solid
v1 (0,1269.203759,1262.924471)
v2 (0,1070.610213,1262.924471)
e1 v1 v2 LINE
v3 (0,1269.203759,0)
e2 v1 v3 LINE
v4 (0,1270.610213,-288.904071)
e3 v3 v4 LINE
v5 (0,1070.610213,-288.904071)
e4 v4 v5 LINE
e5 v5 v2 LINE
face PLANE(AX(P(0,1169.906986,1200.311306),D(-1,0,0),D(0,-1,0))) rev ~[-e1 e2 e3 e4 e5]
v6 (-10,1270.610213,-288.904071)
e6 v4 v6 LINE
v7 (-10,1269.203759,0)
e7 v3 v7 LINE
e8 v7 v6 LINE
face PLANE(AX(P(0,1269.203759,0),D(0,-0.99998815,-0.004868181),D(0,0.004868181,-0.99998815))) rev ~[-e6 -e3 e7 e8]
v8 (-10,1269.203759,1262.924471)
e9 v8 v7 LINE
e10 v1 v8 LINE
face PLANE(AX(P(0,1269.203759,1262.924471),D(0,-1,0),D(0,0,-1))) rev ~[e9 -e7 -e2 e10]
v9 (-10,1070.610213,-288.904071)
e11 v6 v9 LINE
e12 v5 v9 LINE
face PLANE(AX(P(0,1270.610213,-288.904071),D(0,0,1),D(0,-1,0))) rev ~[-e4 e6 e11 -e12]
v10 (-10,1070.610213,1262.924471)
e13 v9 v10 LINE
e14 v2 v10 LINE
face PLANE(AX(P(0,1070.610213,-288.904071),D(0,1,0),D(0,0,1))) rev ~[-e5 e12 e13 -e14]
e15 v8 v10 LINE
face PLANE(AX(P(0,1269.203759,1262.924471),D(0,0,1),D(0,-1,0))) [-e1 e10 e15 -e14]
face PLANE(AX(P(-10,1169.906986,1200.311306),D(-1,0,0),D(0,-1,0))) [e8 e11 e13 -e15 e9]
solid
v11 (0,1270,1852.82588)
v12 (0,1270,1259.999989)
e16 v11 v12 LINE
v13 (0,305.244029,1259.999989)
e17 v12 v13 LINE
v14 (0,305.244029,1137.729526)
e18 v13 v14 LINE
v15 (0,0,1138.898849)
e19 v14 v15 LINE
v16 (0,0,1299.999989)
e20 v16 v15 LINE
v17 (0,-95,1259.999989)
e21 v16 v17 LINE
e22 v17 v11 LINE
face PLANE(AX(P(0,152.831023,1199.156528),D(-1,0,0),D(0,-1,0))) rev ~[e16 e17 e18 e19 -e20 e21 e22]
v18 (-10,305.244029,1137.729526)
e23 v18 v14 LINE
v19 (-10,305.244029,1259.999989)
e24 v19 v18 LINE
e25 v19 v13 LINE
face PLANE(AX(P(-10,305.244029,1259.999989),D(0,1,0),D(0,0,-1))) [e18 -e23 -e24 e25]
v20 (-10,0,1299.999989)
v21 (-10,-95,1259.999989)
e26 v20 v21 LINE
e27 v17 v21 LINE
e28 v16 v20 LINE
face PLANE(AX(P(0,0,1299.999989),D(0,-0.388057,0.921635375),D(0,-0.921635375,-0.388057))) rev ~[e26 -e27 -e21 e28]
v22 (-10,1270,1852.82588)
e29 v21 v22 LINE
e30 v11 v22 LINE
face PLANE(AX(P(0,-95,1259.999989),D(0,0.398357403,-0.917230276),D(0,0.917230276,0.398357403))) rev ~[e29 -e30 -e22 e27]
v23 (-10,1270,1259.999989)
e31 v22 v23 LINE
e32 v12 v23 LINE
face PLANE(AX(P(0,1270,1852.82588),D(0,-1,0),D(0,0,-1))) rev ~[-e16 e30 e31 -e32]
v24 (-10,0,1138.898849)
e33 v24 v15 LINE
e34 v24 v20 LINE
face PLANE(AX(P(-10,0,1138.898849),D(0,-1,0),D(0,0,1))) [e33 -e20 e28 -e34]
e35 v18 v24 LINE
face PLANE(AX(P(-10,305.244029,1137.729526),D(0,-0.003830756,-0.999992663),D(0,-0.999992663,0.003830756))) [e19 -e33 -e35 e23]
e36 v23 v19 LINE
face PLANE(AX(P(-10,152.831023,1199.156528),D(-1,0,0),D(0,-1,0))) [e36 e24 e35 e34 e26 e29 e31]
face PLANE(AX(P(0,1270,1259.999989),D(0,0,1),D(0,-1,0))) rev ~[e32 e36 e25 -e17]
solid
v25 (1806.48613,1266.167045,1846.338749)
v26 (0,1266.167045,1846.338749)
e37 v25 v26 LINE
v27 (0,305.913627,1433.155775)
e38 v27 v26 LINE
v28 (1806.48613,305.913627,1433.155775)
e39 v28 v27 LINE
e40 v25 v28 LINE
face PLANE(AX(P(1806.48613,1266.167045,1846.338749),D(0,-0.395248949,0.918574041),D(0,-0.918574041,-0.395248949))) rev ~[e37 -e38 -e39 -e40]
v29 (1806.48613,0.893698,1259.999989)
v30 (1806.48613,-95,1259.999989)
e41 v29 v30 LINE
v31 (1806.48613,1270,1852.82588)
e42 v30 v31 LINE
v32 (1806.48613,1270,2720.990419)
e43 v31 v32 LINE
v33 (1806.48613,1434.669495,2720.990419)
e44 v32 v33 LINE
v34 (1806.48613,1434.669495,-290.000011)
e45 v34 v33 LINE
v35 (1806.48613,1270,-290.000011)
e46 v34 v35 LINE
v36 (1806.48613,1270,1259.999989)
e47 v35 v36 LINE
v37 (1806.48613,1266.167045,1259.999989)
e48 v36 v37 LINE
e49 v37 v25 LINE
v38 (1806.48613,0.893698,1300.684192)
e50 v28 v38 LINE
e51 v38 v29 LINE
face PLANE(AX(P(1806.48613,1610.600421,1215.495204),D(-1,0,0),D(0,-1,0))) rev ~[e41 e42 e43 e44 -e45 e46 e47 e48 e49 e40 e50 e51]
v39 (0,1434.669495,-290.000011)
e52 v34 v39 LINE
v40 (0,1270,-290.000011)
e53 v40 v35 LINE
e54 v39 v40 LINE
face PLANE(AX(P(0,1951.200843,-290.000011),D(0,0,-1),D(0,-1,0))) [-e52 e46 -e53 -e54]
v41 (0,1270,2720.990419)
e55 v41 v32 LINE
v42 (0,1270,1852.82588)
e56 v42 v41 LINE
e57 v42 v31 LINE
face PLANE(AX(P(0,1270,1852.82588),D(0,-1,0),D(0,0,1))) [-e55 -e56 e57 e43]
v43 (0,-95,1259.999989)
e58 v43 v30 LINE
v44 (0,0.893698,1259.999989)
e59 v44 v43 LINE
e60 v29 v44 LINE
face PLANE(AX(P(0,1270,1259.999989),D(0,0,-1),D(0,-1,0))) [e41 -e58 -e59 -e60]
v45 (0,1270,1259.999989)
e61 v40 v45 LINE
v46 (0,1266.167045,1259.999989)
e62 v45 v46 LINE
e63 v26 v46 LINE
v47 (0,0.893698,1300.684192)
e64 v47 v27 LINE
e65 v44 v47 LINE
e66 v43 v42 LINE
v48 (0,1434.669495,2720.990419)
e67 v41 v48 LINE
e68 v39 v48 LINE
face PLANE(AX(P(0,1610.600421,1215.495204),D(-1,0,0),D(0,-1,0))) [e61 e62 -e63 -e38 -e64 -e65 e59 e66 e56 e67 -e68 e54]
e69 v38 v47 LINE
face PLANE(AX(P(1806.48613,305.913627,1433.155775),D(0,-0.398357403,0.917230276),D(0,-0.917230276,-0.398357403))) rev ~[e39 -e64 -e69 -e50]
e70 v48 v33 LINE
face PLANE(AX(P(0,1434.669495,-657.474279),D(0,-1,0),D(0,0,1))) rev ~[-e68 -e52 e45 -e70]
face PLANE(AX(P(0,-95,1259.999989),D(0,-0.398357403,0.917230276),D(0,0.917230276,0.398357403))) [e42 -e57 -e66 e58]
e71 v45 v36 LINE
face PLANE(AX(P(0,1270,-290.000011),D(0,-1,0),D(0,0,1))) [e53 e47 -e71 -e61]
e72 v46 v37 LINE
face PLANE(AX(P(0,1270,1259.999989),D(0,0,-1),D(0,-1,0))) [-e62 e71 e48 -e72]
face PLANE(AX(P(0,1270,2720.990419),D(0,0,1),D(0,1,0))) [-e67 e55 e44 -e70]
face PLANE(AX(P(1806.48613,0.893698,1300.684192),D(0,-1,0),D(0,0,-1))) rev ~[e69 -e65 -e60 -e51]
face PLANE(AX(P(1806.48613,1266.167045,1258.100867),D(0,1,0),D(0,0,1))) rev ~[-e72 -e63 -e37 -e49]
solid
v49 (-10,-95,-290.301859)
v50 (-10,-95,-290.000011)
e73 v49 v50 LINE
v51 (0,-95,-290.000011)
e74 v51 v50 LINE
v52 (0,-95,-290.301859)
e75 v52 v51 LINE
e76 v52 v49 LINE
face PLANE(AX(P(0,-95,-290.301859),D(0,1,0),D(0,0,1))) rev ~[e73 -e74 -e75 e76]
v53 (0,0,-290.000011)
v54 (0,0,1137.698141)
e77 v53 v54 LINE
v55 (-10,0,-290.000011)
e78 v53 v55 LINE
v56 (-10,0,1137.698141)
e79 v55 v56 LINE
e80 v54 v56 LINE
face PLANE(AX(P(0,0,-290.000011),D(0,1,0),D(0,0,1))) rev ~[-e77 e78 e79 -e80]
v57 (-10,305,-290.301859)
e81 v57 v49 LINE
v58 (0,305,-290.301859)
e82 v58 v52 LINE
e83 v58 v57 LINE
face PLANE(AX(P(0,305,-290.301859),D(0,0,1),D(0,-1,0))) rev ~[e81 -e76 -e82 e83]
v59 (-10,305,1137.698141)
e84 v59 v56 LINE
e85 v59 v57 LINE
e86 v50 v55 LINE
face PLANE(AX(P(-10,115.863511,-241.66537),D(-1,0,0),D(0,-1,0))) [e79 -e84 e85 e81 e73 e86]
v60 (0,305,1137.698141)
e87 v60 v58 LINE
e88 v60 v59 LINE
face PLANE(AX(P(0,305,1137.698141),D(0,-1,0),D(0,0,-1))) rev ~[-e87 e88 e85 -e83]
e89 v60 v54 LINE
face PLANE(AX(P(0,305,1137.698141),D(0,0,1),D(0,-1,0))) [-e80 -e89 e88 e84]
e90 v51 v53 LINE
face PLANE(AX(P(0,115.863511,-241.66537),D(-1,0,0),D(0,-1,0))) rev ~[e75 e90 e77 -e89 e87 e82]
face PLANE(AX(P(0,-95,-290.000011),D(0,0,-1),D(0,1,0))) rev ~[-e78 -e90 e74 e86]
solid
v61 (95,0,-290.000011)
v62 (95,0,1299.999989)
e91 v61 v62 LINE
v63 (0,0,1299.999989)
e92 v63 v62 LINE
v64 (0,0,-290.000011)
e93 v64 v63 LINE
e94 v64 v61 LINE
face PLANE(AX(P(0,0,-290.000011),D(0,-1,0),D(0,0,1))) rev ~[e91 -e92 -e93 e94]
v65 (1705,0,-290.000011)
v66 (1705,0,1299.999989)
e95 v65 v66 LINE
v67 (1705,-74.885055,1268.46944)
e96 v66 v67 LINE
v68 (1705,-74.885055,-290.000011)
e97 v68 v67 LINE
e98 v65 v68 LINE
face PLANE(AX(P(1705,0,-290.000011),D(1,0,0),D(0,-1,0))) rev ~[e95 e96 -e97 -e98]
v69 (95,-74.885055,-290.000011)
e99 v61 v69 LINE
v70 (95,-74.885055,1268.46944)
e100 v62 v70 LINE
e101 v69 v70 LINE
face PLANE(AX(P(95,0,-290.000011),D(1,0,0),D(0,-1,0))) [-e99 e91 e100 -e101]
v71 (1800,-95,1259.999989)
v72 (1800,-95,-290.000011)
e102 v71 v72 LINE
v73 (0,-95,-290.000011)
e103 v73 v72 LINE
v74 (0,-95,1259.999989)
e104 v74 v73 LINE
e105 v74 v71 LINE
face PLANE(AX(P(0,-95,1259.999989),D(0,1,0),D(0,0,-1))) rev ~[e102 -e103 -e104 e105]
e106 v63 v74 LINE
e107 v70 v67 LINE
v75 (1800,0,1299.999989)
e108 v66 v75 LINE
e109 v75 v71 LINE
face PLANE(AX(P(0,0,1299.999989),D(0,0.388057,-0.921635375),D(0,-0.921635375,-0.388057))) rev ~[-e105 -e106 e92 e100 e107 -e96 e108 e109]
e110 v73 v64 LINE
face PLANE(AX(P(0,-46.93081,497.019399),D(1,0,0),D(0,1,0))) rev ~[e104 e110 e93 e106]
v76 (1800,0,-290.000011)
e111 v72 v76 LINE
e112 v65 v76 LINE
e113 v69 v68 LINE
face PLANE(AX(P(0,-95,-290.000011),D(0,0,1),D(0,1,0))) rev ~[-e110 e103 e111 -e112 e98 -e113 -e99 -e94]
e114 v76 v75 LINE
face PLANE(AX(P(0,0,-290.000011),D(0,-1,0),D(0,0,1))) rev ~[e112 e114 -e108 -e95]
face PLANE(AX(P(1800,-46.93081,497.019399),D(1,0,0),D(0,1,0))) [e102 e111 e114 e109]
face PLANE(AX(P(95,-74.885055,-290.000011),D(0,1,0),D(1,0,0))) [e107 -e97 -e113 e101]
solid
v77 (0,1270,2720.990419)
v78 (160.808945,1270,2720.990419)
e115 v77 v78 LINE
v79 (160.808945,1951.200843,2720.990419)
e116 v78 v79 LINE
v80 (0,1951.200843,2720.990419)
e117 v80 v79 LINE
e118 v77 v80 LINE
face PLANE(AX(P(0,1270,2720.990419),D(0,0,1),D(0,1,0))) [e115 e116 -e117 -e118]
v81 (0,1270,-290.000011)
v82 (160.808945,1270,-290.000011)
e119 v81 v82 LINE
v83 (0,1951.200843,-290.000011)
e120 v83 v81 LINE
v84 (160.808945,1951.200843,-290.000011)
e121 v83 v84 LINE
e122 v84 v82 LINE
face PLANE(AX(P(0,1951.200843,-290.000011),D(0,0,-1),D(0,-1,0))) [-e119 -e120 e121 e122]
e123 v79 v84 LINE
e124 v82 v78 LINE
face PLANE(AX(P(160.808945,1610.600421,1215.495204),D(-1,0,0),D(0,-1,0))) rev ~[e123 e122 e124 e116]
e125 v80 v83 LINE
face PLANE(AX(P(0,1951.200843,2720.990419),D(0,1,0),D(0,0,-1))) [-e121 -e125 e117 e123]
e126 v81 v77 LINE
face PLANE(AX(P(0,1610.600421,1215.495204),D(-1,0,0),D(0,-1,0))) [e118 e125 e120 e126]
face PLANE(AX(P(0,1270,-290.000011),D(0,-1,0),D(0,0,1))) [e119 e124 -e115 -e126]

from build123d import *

# Parameters (mm, degrees)
F1_DEPTH  = 1800
F4_DEPTH  = 10
F3_W      = 198.5935460704
F3_H      = 125.2263307571
F3_H_2    = 119
F3_W_2    = 305
F6_DEPTH  = 10
F7_DEPTH  = 1806.4861297607
F9_DEPTH  = 2295.1808217913
F11_DEPTH = 1985.6109861284
F12_W     = 719.2032337189
F12_H     = 3839.0393257141
F13_DEPTH = 2175.1913074404
F14_DEPTH = 160.8089450747
F15_W     = 1610
F15_H     = 74.8850554228
F16_DEPTH = 2483.9819669724


with BuildPart() as f1:
    # F0 (on Right) → F1 (new body)
    with BuildSketch(Plane.YZ):
        Polygon((-95, -290.000010696), (0, -290.000010696), (0, 1299.999989304), (-95, 1259.999989304), align=None)
    extrude(amount=F1_DEPTH)

    # F15 (on face) → F16 (cut)
    with BuildSketch(Plane(origin=(0, 0, -290.000010696), x_dir=(1, 0, 0), z_dir=(0, 0, -1))):
        with Locations((900, 37.4425277114)):
            Rectangle(F15_W, F15_H)
    extrude(amount=-F16_DEPTH, mode=Mode.SUBTRACT)


with BuildPart() as f4:
    # F2 (on face) → F4 (new body)
    with BuildSketch(Plane(origin=(0, 0, 0), x_dir=(0, -1, 0), z_dir=(-1, 0, 0))):
        Polygon((-1270, 1852.8258800507), (-1270, 1259.999989304), (0, 1259.999989304), (0, 1299.999989304), (95, 1259.999989304), align=None)
    extrude(amount=F4_DEPTH)

    # F5 (on face) → F6 (join)
    with BuildSketch(Plane(origin=(-10, 0, 0), x_dir=(0, -1, 0), z_dir=(-1, 0, 0))):
        Polygon((-305.2440285683, 1259.999989304), (-305.2440285683, 1137.7295255661), (0, 1138.8988494873), (0, 1259.999989304), align=None)
    extrude(amount=-F6_DEPTH)


with BuildPart() as f4b:
    # F3 (on face) → F4, piece 2 (new body)
    with BuildSketch(Plane(origin=(0, 0, 0), x_dir=(0, -1, 0), z_dir=(-1, 0, 0))):
        with Locations((-1169.9069863149, 1200.3113059998)):
            Rectangle(F3_W, F3_H)
        with Locations((-1169.9069863149, 840.1981406212)):
            Rectangle(F3_W, F3_H_2)
        with Locations((-1169.9069863149, 1078.1981406212)):
            Rectangle(F3_W, F3_H_2)
        with Locations((-1169.9069863149, 959.1981406212)):
            Rectangle(F3_W, F3_H_2)
        with Locations((-1169.9069863149, 602.1981406212)):
            Rectangle(F3_W, F3_H_2)
        with Locations((-1169.9069863149, 721.1981406212)):
            Rectangle(F3_W, F3_H_2)
        with Locations((-1169.9069863149, 483.1981406212)):
            Rectangle(F3_W, F3_H_2)
        with Locations((-1169.9069863149, 364.1981406212)):
            Rectangle(F3_W, F3_H_2)
        with Locations((-1169.9069863149, 245.1981406212)):
            Rectangle(F3_W, F3_H_2)
        with Locations((-1169.9069863149, 126.1981406212)):
            Rectangle(F3_W, F3_H_2)
        Polygon((-1070.6102132797, 66.6981406212), (-1269.2037593501, 66.6981406212), (-1269.2037593501, 0), (-1269.4583772772, -52.3018593788), (-1070.6102132797, -52.3018593788), align=None)
        Polygon((-1070.6102132797, -171.3018593788), (-1070.6102132797, -52.3018593788), (-1269.4583772772, -52.3018593788), (-1270.0376976624, -171.3018593788), align=None)
        Polygon((-1070.6102132797, -288.9040708542), (-1070.6102132797, -171.3018593788), (-1270.0376976624, -171.3018593788), (-1270.6102132797, -288.9040708542), align=None)
    extrude(amount=F4_DEPTH)


with BuildPart() as f4c:
    # F3 (on face) → F4, piece 3 (new body)
    with BuildSketch(Plane(origin=(0, 0, 0), x_dir=(0, -1, 0), z_dir=(-1, 0, 0))):
        Polygon((0, -171.3018593788), (-305, -171.3018593788), (-305, -290.3018593788), (95, -290.3018593788), (95, -290.000010696), (0, -290.000010696), align=None)
        with Locations((-152.5, -111.8018593788)):
            Rectangle(F3_W_2, F3_H_2)
        with Locations((-152.5, 7.1981406212)):
            Rectangle(F3_W_2, F3_H_2)
        with Locations((-152.5, 126.1981406212)):
            Rectangle(F3_W_2, F3_H_2)
        with Locations((-152.5, 245.1981406212)):
            Rectangle(F3_W_2, F3_H_2)
        with Locations((-152.5, 364.1981406212)):
            Rectangle(F3_W_2, F3_H_2)
        with Locations((-152.5, 483.1981406212)):
            Rectangle(F3_W_2, F3_H_2)
        with Locations((-152.5, 602.1981406212)):
            Rectangle(F3_W_2, F3_H_2)
        with Locations((-152.5, 840.1981406212)):
            Rectangle(F3_W_2, F3_H_2)
        with Locations((-152.5, 959.1981406212)):
            Rectangle(F3_W_2, F3_H_2)
        with Locations((-152.5, 721.1981406212)):
            Rectangle(F3_W_2, F3_H_2)
        with Locations((-152.5, 1078.1981406212)):
            Rectangle(F3_W_2, F3_H_2)
    extrude(amount=F4_DEPTH)


with BuildPart() as f7:
    # F2 (on face) → F7 (new body)
    with BuildSketch(Plane(origin=(0, 0, 0), x_dir=(0, -1, 0), z_dir=(-1, 0, 0))):
        Polygon((-1951.2008428574, -290.000010696), (-1270, -290.000010696), (-1270, 1259.999989304), (-1270, 1852.8258800507), (-1270, 2720.9904193878), (-1951.2008428574, 2720.9904193878), align=None)
        Polygon((-1270, 1852.8258800507), (-1270, 1259.999989304), (0, 1259.999989304), (95, 1259.999989304), align=None)
    extrude(amount=-F7_DEPTH)

    # F8 (on face) → F9 (cut)
    with BuildSketch(Plane.YZ.offset(1806.4861297607)):
        Polygon((305.9136271477, 1261.8664503098), (305.9136271477, 1258.1008672714), (379.9477815628, 1258.1008672714), (522.2533345222, 1258.1008672714), (570.3758001328, 1258.1008672714), (747.250020504, 1258.1008672714), (916.7550802231, 1258.1008672714), (1097.1890687943, 1258.1008672714), (1266.1670446396, 1258.1008672714), (1266.1670446396, 1261.8664503098), (1266.1670446396, 1289.4487380981), (1266.1670446396, 1648.1994390488), (1266.1670446396, 1803.9075136185), (1266.1670446396, 1846.3387489319), (305.9136271477, 1433.1557750702), align=None)
        Polygon((305.9136271477, 1261.8664503098), (305.9136271477, 1259.999989304), (1266.1670446396, 1259.999989304), (1266.1670446396, 1261.8664503098), (1266.1670446396, 1289.4487380981), (1266.1670446396, 1648.1994390488), (1266.1670446396, 1803.9075136185), (1266.1670446396, 1846.3387489319), (305.9136271477, 1433.1557750702), align=None)
    extrude(amount=-F9_DEPTH, mode=Mode.SUBTRACT)

    # F10 (on face) → F11 (cut)
    with BuildSketch(Plane.YZ.offset(1806.4861297607)):
        Polygon((305.9136271477, 1259.999989304), (305.9136271477, 1433.1557750702), (202.2104150255, 1388.116984521), (8.5436779362, 1304.0066138815), (0.8936976359, 1300.6841916209), (0.8936976359, 1259.999989304), align=None)
    extrude(amount=-F11_DEPTH, mode=Mode.SUBTRACT)

    # F12 (on face) → F13 (cut)
    with BuildSketch(Plane(origin=(0, 0, 0), x_dir=(0, -1, 0), z_dir=(-1, 0, 0))):
        with Locations((-1794.2711114883, 1262.0453834534)):
            Rectangle(F12_W, F12_H)
    extrude(amount=-F13_DEPTH, mode=Mode.SUBTRACT)


with BuildPart() as f14:
    # F2 (on face) → F14 (new body)
    with BuildSketch(Plane(origin=(0, 0, 0), x_dir=(0, -1, 0), z_dir=(-1, 0, 0))):
        Polygon((-1951.2008428574, -290.000010696), (-1270, -290.000010696), (-1270, 1259.999989304), (-1270, 1852.8258800507), (-1270, 2720.9904193878), (-1951.2008428574, 2720.9904193878), align=None)
    extrude(amount=-F14_DEPTH)


solid = Compound([f1.part, f4.part, f4b.part, f4c.part, f7.part, f14.part])
